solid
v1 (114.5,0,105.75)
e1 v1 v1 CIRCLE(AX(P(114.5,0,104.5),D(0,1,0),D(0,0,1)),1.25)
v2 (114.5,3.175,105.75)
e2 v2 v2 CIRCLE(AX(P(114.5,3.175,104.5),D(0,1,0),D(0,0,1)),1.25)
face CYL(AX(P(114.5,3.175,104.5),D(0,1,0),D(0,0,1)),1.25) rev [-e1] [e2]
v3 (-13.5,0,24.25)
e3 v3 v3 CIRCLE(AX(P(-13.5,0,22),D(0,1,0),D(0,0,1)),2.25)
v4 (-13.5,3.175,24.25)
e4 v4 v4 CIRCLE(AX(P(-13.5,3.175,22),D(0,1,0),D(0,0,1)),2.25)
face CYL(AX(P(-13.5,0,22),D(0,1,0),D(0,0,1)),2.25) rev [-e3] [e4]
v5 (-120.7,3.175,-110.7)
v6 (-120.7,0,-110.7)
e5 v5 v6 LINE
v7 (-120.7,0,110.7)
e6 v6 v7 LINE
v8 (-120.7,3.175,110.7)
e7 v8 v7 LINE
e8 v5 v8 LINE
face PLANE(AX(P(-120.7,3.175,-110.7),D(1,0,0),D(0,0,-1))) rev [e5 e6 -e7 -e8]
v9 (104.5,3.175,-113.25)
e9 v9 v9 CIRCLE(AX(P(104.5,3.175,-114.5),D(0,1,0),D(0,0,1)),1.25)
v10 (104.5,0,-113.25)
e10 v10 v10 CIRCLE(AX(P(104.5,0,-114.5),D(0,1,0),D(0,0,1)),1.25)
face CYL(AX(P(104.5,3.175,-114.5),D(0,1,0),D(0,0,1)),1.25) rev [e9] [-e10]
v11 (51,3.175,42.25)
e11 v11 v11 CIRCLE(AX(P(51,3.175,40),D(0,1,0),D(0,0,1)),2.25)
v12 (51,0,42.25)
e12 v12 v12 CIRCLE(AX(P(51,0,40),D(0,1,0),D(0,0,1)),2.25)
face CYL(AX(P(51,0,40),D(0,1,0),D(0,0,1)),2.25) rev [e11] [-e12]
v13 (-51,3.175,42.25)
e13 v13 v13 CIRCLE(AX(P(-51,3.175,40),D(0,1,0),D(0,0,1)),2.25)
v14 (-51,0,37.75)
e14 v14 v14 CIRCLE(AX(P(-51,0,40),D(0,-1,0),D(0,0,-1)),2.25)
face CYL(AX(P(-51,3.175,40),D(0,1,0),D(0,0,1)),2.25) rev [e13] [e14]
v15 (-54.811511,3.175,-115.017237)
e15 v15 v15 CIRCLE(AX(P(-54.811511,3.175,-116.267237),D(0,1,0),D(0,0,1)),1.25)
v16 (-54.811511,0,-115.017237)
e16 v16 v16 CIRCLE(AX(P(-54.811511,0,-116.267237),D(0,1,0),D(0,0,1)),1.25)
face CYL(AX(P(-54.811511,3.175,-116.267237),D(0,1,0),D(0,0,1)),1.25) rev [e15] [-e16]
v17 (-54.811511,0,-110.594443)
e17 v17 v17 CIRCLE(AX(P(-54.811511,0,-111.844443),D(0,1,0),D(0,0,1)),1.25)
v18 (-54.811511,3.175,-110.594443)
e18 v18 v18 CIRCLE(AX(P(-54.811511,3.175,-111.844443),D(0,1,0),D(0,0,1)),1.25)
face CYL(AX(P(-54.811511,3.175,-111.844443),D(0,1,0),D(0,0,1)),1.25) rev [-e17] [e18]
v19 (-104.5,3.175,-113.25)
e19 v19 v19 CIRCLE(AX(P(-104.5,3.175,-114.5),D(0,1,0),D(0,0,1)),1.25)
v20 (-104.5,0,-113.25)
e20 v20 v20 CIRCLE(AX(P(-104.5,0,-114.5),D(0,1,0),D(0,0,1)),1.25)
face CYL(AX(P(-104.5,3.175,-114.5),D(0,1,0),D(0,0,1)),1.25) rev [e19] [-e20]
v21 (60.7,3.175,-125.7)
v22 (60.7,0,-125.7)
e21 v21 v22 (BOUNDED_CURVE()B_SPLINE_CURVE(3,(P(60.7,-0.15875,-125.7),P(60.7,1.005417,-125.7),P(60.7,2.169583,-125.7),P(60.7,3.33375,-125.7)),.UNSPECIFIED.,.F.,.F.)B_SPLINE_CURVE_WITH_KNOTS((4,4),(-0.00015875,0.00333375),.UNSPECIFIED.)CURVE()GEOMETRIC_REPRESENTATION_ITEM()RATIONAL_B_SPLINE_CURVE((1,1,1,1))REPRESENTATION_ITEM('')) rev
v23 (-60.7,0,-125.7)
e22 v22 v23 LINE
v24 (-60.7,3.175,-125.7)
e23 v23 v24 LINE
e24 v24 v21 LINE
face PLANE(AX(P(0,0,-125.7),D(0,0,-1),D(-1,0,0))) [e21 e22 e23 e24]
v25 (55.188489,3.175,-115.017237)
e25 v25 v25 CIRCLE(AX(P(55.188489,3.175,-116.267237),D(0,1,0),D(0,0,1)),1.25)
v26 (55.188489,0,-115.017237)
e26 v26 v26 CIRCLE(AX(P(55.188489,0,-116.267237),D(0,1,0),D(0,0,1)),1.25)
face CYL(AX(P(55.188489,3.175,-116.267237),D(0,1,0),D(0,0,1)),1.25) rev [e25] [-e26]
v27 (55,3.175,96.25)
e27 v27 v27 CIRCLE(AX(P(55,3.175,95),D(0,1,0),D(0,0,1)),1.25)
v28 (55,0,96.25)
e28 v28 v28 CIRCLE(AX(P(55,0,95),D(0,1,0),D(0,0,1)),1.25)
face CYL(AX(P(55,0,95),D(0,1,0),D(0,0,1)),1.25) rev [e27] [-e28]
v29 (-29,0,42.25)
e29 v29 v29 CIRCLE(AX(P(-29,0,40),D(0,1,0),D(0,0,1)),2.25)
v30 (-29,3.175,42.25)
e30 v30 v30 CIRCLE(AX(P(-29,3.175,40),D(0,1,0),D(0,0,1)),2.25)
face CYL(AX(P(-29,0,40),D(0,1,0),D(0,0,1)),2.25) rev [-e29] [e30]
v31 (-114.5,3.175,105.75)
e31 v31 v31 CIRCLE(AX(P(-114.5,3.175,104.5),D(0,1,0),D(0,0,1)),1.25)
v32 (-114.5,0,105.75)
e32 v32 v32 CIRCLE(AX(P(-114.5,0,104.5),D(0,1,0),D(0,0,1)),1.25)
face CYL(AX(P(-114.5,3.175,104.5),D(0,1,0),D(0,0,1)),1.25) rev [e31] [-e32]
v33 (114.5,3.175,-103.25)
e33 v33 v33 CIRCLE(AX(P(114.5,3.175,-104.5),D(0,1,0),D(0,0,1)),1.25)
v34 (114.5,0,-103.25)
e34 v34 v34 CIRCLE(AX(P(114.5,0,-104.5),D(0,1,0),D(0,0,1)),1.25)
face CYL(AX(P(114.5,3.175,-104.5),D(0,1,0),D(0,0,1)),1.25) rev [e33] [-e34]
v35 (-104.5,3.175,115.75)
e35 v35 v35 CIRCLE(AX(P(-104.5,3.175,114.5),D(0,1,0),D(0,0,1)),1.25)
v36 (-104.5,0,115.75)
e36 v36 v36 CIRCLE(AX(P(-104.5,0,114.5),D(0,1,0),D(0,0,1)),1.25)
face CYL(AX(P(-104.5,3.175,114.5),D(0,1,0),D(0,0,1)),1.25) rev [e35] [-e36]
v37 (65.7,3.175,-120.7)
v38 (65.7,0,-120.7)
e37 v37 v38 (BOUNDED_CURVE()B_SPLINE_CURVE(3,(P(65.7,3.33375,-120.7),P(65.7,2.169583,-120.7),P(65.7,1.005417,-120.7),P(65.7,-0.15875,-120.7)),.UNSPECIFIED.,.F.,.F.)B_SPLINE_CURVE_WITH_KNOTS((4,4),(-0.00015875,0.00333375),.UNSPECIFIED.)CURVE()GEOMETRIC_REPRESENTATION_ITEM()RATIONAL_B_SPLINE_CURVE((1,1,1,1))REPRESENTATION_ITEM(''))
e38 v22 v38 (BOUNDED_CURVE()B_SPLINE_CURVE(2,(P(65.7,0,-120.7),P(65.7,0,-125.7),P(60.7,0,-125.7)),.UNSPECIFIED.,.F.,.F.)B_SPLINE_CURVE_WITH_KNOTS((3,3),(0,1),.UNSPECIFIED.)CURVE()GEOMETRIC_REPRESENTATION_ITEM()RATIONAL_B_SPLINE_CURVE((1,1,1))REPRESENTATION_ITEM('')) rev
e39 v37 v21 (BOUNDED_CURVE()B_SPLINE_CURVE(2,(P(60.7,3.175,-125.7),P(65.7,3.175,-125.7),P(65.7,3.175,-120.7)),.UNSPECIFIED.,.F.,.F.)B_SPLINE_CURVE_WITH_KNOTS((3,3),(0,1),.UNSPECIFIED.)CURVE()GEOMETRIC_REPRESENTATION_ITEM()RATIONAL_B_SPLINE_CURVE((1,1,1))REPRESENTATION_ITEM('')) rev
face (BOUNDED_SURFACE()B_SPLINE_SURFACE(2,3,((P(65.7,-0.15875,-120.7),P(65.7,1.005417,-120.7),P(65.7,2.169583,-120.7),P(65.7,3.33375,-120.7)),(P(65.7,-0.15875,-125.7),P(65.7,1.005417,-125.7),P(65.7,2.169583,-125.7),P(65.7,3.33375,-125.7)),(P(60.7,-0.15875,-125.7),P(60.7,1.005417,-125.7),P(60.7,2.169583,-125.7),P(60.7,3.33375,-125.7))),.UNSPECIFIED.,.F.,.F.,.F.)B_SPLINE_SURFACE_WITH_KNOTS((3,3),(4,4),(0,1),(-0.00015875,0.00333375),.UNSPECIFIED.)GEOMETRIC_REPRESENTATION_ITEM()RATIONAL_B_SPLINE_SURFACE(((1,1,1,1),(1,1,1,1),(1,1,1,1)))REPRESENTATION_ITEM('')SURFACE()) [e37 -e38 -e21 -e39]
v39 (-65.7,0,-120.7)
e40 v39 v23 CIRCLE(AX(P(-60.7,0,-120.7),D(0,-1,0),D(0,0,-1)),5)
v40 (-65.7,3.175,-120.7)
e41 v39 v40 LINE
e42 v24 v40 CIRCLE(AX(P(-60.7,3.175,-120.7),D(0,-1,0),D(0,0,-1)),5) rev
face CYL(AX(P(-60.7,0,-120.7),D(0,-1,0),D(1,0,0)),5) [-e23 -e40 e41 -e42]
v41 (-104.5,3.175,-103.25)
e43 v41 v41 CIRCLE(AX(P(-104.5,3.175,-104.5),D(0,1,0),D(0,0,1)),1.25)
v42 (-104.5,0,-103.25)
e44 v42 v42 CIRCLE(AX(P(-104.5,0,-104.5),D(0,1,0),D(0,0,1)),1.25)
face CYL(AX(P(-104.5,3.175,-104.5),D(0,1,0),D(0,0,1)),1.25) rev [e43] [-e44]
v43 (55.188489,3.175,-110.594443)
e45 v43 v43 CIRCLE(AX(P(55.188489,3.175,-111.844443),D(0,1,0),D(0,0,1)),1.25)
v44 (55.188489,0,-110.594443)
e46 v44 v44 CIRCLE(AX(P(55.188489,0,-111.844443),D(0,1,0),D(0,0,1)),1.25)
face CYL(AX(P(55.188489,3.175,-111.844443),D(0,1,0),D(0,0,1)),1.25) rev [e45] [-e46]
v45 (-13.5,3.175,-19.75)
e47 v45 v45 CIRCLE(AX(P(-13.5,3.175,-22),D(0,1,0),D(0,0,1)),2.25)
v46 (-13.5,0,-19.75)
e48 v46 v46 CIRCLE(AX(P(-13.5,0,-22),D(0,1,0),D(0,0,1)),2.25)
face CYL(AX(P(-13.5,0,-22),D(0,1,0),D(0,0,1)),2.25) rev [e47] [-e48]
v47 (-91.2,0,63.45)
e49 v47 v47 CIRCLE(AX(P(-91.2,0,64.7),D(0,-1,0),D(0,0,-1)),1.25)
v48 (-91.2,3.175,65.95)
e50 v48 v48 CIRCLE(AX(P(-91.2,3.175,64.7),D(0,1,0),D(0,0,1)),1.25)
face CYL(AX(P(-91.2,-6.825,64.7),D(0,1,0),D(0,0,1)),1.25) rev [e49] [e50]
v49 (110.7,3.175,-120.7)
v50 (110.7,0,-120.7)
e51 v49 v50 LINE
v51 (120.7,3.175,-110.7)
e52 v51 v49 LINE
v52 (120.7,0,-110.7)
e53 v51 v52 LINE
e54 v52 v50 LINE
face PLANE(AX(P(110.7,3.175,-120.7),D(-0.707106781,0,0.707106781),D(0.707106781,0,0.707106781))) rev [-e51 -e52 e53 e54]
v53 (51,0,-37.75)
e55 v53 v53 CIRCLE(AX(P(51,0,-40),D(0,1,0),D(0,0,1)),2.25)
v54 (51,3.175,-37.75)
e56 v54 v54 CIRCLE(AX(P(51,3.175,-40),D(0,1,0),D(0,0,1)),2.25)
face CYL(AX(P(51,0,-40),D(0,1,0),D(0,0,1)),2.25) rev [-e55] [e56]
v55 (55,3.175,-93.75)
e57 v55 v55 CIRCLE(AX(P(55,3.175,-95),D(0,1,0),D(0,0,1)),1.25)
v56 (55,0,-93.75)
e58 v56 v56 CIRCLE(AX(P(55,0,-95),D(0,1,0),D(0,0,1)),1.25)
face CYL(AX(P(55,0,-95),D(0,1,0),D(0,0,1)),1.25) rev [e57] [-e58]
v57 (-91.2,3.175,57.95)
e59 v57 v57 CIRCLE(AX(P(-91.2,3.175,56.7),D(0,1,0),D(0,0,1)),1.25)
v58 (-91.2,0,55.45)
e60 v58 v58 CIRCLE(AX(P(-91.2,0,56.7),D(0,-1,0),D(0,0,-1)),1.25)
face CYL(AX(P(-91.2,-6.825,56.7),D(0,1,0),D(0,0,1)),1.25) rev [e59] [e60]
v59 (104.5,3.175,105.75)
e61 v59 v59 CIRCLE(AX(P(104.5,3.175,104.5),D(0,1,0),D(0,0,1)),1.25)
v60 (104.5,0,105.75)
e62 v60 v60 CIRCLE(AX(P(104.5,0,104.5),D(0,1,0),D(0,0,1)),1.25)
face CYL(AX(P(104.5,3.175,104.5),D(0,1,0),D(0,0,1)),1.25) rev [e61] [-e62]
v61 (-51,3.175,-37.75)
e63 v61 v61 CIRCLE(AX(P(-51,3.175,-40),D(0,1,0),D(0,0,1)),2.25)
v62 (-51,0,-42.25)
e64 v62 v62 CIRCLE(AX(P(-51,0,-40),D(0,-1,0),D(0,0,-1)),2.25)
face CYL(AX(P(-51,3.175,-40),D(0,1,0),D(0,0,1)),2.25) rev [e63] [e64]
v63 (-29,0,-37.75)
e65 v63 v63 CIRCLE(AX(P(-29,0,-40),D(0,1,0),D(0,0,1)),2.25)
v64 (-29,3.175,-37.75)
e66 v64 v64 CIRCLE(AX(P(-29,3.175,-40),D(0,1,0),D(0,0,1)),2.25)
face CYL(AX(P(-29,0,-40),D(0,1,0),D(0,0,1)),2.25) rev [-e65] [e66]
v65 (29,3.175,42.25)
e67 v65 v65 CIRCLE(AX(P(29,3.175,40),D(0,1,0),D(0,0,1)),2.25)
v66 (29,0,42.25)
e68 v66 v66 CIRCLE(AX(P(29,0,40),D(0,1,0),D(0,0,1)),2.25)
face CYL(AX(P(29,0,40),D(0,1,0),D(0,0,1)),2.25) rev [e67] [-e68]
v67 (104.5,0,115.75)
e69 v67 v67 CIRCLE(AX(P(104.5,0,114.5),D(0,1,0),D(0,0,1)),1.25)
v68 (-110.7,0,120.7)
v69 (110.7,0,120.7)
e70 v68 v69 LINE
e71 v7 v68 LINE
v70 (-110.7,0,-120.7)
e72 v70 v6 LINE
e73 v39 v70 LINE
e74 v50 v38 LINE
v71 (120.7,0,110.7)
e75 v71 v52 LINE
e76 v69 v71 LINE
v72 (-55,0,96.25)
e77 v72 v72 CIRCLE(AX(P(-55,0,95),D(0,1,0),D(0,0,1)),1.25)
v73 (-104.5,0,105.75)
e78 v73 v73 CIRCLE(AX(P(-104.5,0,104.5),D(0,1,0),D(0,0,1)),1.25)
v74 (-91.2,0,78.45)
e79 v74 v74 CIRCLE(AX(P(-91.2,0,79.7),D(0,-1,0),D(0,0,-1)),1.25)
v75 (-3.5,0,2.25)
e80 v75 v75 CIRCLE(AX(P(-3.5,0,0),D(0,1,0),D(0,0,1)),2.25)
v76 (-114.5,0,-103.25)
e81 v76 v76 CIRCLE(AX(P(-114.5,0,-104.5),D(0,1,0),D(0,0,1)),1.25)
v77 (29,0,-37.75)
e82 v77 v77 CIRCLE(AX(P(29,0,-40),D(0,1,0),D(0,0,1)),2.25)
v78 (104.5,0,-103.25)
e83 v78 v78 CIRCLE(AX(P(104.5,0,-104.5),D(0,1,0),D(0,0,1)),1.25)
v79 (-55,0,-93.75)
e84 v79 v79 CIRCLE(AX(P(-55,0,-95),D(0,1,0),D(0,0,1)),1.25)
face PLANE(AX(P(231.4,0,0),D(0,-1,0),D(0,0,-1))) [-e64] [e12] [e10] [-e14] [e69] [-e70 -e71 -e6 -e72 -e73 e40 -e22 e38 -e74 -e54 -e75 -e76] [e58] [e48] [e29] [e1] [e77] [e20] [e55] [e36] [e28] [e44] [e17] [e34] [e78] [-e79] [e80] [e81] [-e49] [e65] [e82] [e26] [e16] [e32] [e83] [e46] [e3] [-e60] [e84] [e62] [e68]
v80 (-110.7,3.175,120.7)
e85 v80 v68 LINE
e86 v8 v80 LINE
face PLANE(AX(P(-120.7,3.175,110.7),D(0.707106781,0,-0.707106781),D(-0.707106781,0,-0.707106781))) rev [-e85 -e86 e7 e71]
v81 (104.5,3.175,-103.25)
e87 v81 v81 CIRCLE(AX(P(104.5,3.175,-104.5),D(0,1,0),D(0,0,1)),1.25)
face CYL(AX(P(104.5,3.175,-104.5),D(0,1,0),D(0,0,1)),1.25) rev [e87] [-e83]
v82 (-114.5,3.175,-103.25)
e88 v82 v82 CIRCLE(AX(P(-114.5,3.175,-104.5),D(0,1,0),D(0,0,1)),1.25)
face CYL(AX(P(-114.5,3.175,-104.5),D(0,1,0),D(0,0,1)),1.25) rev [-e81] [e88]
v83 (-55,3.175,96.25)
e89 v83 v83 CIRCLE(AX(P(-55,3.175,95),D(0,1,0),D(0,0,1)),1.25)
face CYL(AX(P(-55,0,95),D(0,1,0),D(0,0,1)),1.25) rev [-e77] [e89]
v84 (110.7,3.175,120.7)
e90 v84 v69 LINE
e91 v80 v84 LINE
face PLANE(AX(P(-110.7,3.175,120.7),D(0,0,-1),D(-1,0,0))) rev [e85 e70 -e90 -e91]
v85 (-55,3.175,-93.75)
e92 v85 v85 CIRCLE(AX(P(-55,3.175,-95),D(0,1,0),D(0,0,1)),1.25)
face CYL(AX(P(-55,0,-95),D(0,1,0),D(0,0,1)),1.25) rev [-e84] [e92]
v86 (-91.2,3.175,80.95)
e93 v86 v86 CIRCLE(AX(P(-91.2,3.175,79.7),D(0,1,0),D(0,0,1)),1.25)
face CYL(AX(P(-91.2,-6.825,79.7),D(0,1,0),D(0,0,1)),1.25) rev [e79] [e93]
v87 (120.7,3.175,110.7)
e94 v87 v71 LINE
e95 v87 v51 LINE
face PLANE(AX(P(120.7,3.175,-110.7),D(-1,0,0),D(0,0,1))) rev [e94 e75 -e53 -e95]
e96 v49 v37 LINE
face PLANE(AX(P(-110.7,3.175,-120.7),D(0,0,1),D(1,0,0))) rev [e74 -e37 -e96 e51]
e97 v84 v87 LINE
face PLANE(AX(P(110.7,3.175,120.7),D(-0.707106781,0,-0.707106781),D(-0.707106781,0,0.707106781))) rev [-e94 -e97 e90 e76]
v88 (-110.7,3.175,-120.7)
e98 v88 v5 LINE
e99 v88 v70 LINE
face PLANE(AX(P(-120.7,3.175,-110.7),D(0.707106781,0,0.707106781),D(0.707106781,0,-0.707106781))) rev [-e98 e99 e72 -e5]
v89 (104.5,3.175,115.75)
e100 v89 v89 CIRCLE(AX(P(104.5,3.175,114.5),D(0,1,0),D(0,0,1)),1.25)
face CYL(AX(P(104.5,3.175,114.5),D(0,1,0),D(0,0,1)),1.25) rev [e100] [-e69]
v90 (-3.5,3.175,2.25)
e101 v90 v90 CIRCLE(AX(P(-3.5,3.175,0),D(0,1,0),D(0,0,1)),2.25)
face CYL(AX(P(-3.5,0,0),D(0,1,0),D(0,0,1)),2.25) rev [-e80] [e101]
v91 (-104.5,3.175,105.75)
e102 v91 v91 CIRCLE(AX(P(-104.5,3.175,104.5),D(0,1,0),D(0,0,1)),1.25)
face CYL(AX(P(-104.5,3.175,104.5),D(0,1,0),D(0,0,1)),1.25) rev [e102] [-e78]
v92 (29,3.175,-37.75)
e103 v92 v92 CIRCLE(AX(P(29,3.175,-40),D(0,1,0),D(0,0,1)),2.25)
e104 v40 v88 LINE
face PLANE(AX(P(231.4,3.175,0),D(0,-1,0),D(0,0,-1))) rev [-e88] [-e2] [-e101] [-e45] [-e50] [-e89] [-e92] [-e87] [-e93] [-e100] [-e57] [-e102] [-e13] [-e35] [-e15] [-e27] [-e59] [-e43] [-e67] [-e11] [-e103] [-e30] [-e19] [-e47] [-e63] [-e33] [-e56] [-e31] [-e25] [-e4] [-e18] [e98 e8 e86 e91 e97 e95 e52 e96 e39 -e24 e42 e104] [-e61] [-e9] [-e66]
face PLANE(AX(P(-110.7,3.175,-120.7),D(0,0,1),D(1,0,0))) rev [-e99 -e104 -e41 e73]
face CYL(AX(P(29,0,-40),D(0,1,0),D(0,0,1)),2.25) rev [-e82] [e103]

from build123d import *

# Parameters (mm, degrees)
BOSS_EXTRUDE1_DEPTH      = 3.175
SKETCH2_R                = 1.5
SKETCH2_R_2              = 2.25
CUT_EXTRUDE1_DEPTH       = 171.725102504
M3X0_5_TAPPED_HOLE1_D    = 2.5
SKETCH5_R                = 1.25
CUT_EXTRUDE2_DEPTH       = 171.725102504
SKETCH6_R                = 1.25
CUT_EXTRUDE3_DEPTH       = 10
M4_CLEARANCE_HOLE1_D     = 4.5
M4_CLEARANCE_HOLE1_DEPTH = 10
M4_CLEARANCE_HOLE1_TIP   = 1.351936393
M3X0_5_TAPPED_HOLE2_D    = 2.5
SKETCH15_W               = 131.4
SKETCH15_H               = 3.175
BOSS_EXTRUDE2_DEPTH      = 5
FILLET1_R                = 5
FILLET2_SIZE             = 5


# Some blends are built 0.0001 mm under size
with BuildPart() as part:
    # Sketch1 → Boss-Extrude1 (new body)
    with BuildSketch(Plane(origin=(0, 0, 0), x_dir=(1, 0, 0), z_dir=(0, 1, 0))):
        Polygon((-110.7, 120.7), (110.7, 120.7), (120.7, 110.7), (120.7, -110.7), (110.7, -120.7), (-110.7, -120.7), (-120.7, -110.7), (-120.7, 110.7), align=None)
    extrude(amount=BOSS_EXTRUDE1_DEPTH)

    # Sketch2 → Cut-Extrude1 (cut, through all)
    with BuildSketch(Plane(origin=(0, 3.175, 0), x_dir=(1, 0, 0), z_dir=(0, 1, 0))):
        with Locations(Location((-51, -40, 0), (0, 0, 270))):
            Circle(SKETCH2_R)
        with Locations(Location((-29, -40, 0), (0, 0, 270))):
            Circle(SKETCH2_R_2)
        with Locations(Location((-51, 40, 0), (0, 0, 270))):
            Circle(SKETCH2_R)
        with Locations(Location((-29, 40, 0), (0, 0, 270))):
            Circle(SKETCH2_R_2)
        with Locations(Location((29, 40, 0), (0, 0, 270))):
            Circle(SKETCH2_R_2)
        with Locations(Location((51, 40, 0), (0, 0, 270))):
            Circle(SKETCH2_R_2)
        with Locations(Location((29, -40, 0), (0, 0, 270))):
            Circle(SKETCH2_R_2)
        with Locations(Location((51, -40, 0), (0, 0, 270))):
            Circle(SKETCH2_R_2)
        with Locations(Location((-3.5, 0, 0), (0, 0, 270))):
            Circle(SKETCH2_R_2)
        with Locations(Location((-13.5, 22, 0), (0, 0, 270))):
            Circle(SKETCH2_R_2)
        with Locations(Location((-13.5, -22, 0), (0, 0, 270))):
            Circle(SKETCH2_R_2)
    extrude(amount=-CUT_EXTRUDE1_DEPTH, mode=Mode.SUBTRACT)

    # M3x0.5 Tapped Hole1 (through all)
    with Locations(Plane(origin=(0, 3.175, 0), x_dir=(-1, 0, 0), z_dir=(0, 1, 0))):
        with Locations((114.5, -104.5), (104.5, -114.5), (-104.5, -114.5), (-114.5, -104.5), (-114.5, 104.5), (-104.5, 114.5), (104.5, 114.5), (114.5, 104.5), (-104.5, 104.5), (-104.5, -104.5), (104.5, -104.5), (104.5, 104.5)):
            Hole(M3X0_5_TAPPED_HOLE1_D / 2)

    # Sketch5 → Cut-Extrude2 (cut, through all)
    with BuildSketch(Plane(origin=(0, 3.175, 0), x_dir=(1, 0, 0), z_dir=(0, 1, 0))):
        with Locations(Location((-55, 95, 0), (0, 0, 270))):
            Circle(SKETCH5_R)
        with Locations(Location((55, 95, 0), (0, 0, 270))):
            Circle(SKETCH5_R)
        with Locations(Location((-55, -95, 0), (0, 0, 270))):
            Circle(SKETCH5_R)
        with Locations(Location((55, -95, 0), (0, 0, 270))):
            Circle(SKETCH5_R)
    extrude(amount=-CUT_EXTRUDE2_DEPTH, mode=Mode.SUBTRACT)

    # Sketch6 → Cut-Extrude3 (cut)
    with BuildSketch(Plane(origin=(0, 3.175, 0), x_dir=(1, 0, 0), z_dir=(0, 1, 0))):
        with Locations(Location((-91.2, -64.7, 0), (0, 0, 270))):
            Circle(SKETCH6_R)
        with Locations(Location((-91.2, -56.7, 0), (0, 0, 270))):
            Circle(SKETCH6_R)
        with Locations(Location((-91.2, -79.7, 0), (0, 0, 270))):
            Circle(SKETCH6_R)
    extrude(amount=-CUT_EXTRUDE3_DEPTH, mode=Mode.SUBTRACT)

    # M4 Clearance Hole1
    with Locations(Plane(origin=(0, 3.175, 0), x_dir=(-1, 0, 0), z_dir=(0, 1, 0))):
        with Locations((51, -40), (51, 40)):
            Hole(M4_CLEARANCE_HOLE1_D / 2, depth=M4_CLEARANCE_HOLE1_DEPTH)
            with Locations((0, 0, -(M4_CLEARANCE_HOLE1_DEPTH + M4_CLEARANCE_HOLE1_TIP / 2))):  # 118° drill point
                Cone(0, M4_CLEARANCE_HOLE1_D / 2, M4_CLEARANCE_HOLE1_TIP, mode=Mode.SUBTRACT)

    # M3x0.5 Tapped Hole2 (through all)
    with Locations(Plane(origin=(0, 3.175, 0), x_dir=(-1, 0, 0), z_dir=(0, 1, 0))):
        with Locations((-55.188488938, -111.84444349), (54.811511062, -111.84444349), (-55.188488938, -116.267236791), (54.811511062, -116.267236791)):
            Hole(M3X0_5_TAPPED_HOLE2_D / 2)

    # Sketch15 → Boss-Extrude2 (add)
    with BuildSketch(Plane(origin=(0, 0, -120.7), x_dir=(-1, 0, 0), z_dir=(0, 0, -1))):
        with Locations((0, 1.5875)):
            Rectangle(SKETCH15_W, SKETCH15_H)
    extrude(amount=BOSS_EXTRUDE2_DEPTH)

    # Fillet1
    fillet1_edges = [part.edges().sort_by_distance(p)[0] for p in [
        (-65.7, 1.5875, -125.7),
    ]]
    fillet(fillet1_edges, radius=FILLET1_R - 0.0001)  # a hair under: the kernel refuses the full size

    # Fillet2
    # a fillet whose section is not a circle: 5 mm, written as the material it takes off along each edge
    with BuildSketch(Plane(origin=(65.7, -12.5, -125.7), x_dir=(-1, 0, 0), z_dir=(0, 1, 0))) as fillet2_piece_1:
        with BuildLine():
            Bezier((FILLET2_SIZE, 0), (0, 0), (0, FILLET2_SIZE), weights=[1, 1, 1])
            Line((0, FILLET2_SIZE), (0, 0))
            Line((0, 0), (FILLET2_SIZE, 0))
        make_face()
    extrude(amount=28.175, mode=Mode.SUBTRACT)


solid = part.part
